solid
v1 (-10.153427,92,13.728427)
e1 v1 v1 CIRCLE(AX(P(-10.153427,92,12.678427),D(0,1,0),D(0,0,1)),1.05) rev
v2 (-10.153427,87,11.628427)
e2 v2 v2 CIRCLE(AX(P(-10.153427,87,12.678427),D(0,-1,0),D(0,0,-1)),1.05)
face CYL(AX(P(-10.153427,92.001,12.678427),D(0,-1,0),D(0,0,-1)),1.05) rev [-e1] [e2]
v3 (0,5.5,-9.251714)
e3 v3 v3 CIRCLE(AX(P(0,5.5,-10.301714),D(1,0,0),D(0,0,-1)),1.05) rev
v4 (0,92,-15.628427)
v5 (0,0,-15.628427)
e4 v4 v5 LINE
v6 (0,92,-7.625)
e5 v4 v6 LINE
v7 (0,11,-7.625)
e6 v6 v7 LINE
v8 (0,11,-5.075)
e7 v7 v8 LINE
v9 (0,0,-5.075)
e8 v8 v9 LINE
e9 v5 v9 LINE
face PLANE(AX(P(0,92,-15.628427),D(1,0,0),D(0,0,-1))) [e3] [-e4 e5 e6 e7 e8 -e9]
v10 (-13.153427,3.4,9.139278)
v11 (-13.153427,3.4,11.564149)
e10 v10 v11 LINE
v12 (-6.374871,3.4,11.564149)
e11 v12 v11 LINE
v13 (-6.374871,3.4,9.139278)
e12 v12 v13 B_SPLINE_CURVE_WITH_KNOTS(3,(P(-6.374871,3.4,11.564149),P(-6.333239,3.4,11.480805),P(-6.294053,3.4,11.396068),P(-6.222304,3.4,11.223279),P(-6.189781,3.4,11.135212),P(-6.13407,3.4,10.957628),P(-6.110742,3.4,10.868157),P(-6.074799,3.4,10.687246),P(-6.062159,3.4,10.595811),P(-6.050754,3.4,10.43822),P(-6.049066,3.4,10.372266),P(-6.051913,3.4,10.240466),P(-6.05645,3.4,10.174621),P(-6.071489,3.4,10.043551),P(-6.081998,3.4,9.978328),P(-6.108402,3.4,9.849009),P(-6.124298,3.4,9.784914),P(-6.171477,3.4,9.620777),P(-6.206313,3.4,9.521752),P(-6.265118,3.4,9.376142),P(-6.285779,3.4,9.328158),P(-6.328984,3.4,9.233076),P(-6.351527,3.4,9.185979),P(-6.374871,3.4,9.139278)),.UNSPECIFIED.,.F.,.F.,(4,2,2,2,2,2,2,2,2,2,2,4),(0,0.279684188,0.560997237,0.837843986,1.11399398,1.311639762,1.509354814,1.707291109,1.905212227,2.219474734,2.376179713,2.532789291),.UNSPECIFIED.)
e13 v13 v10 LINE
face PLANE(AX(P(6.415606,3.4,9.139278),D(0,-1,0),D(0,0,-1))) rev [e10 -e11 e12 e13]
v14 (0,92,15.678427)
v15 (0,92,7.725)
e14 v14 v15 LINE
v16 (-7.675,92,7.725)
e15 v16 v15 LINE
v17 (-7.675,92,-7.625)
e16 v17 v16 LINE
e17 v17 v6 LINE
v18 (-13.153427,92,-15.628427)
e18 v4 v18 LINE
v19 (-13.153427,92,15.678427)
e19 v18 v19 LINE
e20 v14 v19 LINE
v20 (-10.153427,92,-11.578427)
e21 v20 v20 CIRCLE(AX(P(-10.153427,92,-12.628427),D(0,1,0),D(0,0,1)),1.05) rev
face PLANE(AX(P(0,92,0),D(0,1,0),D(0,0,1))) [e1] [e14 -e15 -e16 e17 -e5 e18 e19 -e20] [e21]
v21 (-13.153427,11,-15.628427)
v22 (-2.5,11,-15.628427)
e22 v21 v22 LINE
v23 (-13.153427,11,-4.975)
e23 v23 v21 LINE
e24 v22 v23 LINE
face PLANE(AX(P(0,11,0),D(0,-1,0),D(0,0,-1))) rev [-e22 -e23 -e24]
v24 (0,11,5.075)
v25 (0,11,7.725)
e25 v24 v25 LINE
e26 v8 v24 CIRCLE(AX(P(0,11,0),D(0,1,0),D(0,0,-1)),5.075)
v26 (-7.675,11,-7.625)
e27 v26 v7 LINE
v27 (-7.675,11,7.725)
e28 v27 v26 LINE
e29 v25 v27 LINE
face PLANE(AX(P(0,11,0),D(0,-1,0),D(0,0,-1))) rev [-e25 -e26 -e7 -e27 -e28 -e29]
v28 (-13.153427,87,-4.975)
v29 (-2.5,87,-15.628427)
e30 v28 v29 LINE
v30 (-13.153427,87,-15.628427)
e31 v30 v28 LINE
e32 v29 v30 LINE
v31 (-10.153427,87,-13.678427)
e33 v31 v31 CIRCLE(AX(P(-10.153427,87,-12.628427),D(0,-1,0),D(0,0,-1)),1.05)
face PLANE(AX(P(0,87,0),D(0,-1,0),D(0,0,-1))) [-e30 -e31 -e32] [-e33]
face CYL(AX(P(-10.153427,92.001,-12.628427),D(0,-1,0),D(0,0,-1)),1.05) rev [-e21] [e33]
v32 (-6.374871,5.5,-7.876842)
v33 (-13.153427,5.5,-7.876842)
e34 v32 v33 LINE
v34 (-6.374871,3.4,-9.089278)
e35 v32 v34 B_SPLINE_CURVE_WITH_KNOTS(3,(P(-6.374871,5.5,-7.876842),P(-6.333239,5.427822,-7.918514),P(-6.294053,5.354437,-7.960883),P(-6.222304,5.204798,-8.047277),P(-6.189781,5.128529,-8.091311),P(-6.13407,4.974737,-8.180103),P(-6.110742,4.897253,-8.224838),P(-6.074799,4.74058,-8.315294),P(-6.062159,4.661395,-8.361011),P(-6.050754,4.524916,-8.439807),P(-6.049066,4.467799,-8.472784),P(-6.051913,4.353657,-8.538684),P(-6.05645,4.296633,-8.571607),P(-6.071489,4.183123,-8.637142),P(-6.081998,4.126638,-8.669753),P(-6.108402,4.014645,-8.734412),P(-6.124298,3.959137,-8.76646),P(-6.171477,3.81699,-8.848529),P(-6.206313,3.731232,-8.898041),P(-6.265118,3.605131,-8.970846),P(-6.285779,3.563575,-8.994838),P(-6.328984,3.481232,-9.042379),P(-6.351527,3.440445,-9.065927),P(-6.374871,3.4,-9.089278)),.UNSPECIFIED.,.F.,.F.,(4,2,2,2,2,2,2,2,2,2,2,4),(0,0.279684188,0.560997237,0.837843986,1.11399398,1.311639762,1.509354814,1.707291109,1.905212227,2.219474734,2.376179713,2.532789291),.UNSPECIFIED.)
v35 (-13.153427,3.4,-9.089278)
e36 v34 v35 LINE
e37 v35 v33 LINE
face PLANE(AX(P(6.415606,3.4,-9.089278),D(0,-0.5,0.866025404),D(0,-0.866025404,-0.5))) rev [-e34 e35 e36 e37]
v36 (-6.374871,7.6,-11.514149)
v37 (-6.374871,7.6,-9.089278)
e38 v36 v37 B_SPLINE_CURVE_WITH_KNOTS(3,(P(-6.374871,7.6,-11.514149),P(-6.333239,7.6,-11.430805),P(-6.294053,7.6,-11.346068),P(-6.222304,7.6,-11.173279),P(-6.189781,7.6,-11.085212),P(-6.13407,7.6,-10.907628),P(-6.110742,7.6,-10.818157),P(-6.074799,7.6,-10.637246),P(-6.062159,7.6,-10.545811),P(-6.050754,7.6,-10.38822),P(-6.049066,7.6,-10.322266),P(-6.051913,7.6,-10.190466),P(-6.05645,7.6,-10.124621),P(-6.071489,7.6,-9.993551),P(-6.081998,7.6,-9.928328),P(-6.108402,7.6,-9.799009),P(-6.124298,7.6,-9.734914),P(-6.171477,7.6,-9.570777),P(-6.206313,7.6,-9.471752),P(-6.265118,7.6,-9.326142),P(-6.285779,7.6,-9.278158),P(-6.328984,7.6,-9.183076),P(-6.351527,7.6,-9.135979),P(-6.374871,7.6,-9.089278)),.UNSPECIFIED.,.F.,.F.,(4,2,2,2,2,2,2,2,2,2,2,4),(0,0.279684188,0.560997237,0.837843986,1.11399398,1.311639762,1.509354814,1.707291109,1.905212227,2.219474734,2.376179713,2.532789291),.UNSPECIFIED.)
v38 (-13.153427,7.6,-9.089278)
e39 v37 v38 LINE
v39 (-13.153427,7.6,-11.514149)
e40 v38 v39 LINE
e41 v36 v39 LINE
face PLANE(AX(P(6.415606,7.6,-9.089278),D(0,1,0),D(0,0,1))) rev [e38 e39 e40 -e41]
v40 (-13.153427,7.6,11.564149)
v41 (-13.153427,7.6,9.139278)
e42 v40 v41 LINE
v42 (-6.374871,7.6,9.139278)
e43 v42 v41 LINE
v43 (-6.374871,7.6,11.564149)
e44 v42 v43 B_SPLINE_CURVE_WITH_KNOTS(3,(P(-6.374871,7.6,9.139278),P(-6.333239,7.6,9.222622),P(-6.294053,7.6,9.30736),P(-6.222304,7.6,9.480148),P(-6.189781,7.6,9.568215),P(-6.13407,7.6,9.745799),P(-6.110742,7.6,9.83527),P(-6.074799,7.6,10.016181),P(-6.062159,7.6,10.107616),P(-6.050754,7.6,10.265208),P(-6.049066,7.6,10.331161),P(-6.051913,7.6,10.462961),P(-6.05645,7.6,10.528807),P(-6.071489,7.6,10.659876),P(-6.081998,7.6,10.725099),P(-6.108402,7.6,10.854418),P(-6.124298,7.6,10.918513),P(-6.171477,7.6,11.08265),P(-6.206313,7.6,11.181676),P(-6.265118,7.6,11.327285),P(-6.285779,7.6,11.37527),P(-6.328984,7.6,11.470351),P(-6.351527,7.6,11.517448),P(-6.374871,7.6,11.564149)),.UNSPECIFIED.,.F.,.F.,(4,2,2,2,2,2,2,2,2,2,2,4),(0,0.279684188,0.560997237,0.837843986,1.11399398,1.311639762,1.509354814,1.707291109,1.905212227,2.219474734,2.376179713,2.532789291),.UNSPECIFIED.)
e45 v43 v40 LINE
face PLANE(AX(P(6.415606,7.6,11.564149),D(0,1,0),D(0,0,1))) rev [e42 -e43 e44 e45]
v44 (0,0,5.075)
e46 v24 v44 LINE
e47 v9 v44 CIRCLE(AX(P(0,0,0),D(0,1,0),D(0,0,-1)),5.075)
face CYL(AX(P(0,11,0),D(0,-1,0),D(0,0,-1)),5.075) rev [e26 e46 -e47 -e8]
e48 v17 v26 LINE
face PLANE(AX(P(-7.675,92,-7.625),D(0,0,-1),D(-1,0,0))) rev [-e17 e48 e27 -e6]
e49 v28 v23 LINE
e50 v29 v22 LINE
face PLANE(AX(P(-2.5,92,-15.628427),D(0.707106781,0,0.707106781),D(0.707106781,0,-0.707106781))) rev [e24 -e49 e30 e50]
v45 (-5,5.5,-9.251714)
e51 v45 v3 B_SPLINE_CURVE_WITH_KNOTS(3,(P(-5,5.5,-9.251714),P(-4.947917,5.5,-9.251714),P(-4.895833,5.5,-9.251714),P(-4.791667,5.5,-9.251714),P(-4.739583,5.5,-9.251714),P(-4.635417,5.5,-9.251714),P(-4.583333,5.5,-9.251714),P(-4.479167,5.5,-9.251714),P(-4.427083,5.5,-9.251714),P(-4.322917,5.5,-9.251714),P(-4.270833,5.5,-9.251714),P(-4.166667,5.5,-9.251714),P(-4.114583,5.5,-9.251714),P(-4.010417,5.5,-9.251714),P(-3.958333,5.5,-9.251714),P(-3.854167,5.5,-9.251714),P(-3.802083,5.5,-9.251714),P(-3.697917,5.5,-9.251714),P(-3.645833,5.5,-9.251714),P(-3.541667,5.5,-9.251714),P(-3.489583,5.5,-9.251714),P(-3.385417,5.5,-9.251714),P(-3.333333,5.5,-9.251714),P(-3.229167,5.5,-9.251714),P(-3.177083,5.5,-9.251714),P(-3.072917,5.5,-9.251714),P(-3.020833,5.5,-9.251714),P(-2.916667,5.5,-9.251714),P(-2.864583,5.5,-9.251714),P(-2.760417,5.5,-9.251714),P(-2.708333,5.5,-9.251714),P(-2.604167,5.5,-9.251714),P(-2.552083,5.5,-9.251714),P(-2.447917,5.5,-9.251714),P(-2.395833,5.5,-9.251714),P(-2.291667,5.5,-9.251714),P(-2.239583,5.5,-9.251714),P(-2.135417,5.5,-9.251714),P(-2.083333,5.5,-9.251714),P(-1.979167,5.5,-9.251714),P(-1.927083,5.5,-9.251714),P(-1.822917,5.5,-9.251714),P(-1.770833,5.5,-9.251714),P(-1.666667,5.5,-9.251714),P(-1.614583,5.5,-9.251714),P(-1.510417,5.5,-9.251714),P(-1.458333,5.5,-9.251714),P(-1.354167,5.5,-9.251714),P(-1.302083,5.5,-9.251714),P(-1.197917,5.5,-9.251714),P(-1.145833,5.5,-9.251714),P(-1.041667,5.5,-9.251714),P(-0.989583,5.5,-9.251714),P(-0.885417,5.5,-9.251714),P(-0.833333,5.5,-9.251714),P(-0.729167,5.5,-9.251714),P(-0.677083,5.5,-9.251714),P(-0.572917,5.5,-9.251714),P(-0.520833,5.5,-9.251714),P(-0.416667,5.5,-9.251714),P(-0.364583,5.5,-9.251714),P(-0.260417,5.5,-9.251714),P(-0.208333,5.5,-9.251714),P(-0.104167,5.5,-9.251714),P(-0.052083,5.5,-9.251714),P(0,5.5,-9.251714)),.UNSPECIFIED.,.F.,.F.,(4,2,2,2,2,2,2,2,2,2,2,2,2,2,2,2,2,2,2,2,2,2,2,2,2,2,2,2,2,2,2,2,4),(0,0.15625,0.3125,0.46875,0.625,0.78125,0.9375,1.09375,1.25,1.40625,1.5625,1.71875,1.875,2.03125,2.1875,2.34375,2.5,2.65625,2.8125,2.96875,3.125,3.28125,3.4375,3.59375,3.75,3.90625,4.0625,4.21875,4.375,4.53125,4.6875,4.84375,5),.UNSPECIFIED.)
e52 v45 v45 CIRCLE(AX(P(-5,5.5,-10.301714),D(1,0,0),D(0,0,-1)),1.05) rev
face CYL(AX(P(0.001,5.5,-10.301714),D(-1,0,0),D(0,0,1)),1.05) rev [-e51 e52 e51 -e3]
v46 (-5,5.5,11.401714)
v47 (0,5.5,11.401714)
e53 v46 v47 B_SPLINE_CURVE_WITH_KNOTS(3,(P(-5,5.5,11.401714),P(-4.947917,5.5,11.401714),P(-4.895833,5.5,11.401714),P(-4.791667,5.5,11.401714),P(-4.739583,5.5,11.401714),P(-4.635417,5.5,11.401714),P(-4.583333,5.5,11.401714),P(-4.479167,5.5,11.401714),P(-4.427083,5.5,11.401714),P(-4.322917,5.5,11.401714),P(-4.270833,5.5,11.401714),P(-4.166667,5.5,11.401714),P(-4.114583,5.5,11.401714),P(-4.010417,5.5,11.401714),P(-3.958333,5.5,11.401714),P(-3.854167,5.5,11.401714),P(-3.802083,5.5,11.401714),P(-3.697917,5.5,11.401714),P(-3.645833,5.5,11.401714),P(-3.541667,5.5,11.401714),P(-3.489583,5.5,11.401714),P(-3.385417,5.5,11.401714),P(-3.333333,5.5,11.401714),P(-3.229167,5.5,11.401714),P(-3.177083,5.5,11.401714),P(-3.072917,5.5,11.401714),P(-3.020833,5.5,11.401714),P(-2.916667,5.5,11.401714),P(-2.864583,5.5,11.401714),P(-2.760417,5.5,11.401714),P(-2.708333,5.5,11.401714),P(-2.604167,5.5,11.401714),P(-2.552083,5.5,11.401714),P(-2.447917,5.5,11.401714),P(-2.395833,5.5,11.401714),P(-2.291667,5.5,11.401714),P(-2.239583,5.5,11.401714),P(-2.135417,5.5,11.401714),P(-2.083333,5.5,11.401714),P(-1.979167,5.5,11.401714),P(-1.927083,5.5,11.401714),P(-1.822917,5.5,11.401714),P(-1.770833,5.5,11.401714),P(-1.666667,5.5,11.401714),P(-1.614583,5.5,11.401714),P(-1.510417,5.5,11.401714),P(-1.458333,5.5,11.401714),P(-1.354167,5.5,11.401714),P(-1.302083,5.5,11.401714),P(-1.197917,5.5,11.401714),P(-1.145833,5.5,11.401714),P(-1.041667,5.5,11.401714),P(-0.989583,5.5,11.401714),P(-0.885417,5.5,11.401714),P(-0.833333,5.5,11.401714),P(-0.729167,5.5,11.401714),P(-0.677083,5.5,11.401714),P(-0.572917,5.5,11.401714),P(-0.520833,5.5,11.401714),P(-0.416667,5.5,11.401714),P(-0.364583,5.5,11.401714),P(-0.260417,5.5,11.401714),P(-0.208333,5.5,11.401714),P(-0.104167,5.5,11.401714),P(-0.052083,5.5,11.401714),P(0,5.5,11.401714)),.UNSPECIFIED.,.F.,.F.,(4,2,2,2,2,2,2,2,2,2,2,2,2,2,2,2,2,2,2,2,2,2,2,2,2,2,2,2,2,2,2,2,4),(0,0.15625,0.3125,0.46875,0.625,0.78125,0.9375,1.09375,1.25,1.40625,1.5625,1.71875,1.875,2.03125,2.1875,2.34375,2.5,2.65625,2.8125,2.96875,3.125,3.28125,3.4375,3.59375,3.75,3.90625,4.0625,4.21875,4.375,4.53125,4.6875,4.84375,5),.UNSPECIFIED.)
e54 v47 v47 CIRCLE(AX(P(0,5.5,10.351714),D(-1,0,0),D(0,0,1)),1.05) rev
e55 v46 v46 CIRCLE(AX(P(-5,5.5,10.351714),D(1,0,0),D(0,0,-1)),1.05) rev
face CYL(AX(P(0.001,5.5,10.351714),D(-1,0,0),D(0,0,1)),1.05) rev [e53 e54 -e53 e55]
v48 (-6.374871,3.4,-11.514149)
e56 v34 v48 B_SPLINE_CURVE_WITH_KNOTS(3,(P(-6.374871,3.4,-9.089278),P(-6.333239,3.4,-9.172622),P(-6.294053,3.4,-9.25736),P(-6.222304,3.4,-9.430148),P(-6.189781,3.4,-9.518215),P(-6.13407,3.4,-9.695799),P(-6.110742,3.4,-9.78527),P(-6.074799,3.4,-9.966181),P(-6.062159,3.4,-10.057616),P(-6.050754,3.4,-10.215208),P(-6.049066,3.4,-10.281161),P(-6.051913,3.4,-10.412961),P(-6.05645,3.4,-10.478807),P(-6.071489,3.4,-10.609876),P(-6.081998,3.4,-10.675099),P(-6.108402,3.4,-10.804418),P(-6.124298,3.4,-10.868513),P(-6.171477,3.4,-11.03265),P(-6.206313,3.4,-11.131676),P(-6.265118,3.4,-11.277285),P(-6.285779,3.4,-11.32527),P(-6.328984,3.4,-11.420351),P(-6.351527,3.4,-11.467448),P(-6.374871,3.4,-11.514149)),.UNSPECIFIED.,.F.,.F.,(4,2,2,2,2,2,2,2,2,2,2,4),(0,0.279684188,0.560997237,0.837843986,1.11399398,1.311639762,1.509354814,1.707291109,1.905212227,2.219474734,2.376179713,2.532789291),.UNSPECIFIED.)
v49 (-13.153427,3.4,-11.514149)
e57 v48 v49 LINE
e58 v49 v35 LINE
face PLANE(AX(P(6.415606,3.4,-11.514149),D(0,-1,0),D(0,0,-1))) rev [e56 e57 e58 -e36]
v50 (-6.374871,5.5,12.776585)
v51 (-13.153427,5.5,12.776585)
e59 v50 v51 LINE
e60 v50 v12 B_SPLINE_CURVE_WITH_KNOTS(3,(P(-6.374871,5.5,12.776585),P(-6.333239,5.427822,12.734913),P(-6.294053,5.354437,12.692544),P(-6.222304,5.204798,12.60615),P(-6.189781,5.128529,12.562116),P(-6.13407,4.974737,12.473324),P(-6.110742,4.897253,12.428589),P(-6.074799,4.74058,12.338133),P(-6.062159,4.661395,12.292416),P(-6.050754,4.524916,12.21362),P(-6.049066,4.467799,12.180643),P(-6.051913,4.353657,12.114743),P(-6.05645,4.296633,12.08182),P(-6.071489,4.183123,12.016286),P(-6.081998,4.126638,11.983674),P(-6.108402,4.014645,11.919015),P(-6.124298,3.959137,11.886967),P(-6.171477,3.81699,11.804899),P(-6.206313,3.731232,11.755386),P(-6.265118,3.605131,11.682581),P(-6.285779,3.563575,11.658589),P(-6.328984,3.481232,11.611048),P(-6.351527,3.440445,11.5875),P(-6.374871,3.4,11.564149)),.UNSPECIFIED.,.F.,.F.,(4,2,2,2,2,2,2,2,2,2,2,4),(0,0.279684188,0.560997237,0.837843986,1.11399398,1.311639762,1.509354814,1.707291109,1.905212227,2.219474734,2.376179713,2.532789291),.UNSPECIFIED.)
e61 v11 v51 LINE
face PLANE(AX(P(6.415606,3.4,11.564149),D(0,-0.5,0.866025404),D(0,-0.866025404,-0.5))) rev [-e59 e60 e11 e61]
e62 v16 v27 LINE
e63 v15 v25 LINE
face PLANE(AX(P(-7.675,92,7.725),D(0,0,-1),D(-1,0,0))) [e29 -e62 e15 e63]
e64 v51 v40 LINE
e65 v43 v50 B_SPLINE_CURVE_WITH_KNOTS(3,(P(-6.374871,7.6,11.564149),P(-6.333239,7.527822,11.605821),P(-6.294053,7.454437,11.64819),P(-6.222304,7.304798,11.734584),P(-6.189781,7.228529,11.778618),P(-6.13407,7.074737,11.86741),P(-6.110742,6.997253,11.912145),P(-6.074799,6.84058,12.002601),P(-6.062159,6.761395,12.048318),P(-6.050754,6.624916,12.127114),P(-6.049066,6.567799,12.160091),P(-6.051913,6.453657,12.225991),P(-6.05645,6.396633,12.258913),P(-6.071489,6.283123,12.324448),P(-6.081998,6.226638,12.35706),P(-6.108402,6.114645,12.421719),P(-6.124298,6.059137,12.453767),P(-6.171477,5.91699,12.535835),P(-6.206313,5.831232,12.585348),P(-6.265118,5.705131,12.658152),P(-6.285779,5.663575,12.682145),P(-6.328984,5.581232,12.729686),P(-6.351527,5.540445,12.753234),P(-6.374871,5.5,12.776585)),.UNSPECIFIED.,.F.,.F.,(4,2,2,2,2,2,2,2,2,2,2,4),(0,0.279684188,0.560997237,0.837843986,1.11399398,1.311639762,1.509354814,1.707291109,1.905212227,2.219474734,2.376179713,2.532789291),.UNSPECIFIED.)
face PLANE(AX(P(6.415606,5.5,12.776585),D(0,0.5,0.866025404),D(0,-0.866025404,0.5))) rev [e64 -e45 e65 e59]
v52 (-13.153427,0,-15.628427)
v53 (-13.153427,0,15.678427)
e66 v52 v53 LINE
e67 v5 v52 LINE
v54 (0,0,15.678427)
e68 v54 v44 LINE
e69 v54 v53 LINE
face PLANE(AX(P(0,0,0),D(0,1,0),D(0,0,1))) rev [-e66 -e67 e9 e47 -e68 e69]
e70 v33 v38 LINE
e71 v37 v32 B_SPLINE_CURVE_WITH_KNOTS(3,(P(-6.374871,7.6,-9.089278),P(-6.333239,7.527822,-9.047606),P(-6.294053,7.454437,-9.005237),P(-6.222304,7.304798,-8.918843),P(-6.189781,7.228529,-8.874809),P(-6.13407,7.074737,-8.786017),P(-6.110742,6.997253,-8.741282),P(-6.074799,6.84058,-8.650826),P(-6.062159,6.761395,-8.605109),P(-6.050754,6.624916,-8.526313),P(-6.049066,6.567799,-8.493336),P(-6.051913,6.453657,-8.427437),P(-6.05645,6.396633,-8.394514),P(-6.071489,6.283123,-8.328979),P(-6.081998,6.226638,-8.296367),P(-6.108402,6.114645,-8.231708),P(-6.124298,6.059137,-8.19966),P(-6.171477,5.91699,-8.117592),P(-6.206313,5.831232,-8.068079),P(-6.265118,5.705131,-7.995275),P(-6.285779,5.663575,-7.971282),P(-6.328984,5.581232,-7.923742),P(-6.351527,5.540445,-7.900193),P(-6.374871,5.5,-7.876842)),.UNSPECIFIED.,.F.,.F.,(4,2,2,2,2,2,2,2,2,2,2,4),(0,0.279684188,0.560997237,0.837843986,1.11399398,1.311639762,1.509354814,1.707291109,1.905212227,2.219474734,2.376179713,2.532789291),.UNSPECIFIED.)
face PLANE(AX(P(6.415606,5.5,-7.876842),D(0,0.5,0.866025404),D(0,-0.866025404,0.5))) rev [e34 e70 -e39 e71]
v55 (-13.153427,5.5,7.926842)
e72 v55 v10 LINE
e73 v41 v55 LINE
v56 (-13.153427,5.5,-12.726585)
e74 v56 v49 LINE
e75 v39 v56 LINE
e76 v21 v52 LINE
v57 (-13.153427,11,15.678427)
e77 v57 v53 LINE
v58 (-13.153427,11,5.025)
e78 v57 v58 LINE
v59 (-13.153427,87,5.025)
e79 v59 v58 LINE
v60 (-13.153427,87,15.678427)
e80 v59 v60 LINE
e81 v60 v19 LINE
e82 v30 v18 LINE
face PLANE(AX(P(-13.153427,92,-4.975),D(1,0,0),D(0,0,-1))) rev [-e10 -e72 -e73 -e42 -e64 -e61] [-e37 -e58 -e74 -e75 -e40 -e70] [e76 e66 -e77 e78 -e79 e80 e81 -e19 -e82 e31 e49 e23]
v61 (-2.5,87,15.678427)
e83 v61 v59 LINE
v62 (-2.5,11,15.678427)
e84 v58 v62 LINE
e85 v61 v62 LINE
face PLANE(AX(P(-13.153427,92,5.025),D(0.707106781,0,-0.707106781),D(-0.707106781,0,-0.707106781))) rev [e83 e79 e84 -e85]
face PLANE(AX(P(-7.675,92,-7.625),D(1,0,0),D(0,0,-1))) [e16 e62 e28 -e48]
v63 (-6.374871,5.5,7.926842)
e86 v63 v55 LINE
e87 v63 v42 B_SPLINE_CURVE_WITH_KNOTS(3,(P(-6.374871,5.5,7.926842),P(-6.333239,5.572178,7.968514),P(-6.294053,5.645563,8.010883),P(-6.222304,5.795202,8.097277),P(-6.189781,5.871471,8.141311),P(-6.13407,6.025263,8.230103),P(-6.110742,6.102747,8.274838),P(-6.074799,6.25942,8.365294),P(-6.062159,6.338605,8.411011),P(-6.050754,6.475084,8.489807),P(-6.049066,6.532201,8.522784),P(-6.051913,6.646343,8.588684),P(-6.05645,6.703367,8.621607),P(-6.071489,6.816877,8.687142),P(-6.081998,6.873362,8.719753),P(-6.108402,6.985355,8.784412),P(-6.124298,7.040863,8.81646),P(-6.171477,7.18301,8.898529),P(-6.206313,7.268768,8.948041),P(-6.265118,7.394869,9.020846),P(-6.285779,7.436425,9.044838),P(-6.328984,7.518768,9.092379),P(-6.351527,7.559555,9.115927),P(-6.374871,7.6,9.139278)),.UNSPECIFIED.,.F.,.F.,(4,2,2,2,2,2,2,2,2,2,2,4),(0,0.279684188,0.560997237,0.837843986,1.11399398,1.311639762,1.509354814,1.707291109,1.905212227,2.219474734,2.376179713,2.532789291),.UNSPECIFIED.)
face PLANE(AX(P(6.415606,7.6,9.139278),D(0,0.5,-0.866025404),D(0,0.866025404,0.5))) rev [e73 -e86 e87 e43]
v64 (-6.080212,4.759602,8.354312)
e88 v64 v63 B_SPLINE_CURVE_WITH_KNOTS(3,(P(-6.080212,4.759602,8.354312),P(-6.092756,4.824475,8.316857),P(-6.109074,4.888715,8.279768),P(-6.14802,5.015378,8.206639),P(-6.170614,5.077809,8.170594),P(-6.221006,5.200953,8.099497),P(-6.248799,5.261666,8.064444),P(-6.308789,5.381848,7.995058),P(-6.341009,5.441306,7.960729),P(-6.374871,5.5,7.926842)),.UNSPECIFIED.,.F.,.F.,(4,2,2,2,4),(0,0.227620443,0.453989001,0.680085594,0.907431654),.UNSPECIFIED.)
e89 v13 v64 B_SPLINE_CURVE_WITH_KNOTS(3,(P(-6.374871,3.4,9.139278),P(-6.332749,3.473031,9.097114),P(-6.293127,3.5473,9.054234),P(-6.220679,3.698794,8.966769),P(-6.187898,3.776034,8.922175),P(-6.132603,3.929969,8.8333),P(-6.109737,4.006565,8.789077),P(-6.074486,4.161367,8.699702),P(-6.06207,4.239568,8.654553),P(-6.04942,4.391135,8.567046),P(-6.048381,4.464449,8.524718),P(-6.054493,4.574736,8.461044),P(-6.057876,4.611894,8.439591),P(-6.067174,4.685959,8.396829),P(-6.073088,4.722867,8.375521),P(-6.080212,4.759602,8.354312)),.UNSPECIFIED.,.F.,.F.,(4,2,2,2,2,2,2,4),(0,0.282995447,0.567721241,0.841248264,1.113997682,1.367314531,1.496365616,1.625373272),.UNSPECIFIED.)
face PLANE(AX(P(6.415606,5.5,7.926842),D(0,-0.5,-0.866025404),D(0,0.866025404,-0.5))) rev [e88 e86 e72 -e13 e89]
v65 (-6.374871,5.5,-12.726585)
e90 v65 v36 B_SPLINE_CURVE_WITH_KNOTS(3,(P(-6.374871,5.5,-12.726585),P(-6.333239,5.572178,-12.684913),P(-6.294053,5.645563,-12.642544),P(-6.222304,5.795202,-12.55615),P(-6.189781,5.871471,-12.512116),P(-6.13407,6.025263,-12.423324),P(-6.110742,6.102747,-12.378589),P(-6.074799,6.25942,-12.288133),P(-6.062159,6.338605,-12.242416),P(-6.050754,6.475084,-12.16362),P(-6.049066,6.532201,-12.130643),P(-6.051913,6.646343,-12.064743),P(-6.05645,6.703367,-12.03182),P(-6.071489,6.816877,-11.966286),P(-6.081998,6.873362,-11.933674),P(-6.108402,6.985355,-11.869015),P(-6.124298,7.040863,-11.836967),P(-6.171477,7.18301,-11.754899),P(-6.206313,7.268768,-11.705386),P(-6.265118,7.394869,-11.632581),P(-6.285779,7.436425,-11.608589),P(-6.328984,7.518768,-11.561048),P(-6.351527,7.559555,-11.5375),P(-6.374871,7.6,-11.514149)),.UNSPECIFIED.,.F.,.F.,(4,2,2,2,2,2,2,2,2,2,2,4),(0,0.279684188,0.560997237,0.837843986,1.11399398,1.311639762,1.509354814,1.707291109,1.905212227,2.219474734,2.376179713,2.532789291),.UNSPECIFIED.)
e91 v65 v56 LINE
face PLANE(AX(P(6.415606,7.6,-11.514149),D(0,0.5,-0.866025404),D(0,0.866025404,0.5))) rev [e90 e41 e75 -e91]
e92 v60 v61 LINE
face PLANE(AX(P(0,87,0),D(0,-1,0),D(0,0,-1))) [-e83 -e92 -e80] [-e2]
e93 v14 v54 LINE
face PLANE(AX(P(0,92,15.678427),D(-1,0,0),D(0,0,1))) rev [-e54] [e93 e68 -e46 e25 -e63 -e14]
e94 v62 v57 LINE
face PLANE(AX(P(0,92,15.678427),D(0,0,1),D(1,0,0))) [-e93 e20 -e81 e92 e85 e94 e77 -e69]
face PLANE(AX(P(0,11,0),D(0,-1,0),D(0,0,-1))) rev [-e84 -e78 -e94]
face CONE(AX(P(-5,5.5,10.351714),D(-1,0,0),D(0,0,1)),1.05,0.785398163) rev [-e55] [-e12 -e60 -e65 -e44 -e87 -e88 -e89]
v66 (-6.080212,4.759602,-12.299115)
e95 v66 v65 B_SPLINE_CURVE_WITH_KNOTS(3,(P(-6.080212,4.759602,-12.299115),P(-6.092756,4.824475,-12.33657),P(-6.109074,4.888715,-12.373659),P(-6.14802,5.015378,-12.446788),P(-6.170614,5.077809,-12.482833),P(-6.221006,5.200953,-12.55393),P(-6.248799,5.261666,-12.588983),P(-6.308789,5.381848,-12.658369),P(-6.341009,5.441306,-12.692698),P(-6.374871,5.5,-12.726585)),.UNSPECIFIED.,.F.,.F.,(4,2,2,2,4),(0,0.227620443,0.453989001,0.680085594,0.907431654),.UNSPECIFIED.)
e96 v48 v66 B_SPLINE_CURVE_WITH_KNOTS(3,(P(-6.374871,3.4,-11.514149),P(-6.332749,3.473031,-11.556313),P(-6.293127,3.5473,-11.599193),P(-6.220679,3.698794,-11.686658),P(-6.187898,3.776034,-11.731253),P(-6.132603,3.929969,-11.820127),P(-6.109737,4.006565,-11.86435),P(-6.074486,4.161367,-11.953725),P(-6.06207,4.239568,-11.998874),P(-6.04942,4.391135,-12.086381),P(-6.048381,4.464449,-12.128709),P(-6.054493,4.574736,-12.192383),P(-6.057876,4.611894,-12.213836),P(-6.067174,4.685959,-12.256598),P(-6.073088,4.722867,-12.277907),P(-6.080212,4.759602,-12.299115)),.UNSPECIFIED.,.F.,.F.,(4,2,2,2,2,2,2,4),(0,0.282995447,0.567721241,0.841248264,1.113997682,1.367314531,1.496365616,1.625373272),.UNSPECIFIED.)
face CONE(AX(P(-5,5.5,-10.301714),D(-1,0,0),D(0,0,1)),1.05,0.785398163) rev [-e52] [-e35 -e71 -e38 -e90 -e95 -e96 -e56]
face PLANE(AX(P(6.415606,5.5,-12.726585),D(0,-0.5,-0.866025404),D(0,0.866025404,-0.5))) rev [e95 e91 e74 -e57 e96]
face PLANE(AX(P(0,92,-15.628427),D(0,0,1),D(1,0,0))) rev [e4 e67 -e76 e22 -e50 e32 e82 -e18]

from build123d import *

# Parameters (mm, degrees)
BOSS_EXTRUDE1_DEPTH = 92
BOSS_EXTRUDE2_DEPTH = 11
BOSS_EXTRUDE3_DEPTH = 5
CUT_EXTRUDE1_REACH  = 91.375
SKETCH4_R           = 1.05
BOSS_EXTRUDE4_DEPTH = 11
CUT_EXTRUDE2_DEPTH  = 6.153427125
CUT_EXTRUDE3_REACH  = 96.249
SKETCH7_R           = 1.05
CHAMFER2_SIZE       = 2


with BuildPart() as part:
    # Sketch1 → Boss-Extrude1 (new body)
    with BuildSketch(Plane(origin=(0, 0, 0), x_dir=(1, 0, 0), z_dir=(0, 1, 0))):
        Polygon((0, 15.628427125), (-2.5, 15.628427125), (-13.153427125, 4.975), (-13.153427125, -5.025), (-2.5, -15.678427125), (0, -15.678427125), (0, -7.725), (-7.675, -7.725), (-7.675, 7.625), (0, 7.625), align=None)
    extrude(amount=BOSS_EXTRUDE1_DEPTH)

    # Sketch2 → Boss-Extrude2 (add)
    with BuildSketch(Plane.XZ):
        with BuildLine():
            Line((0, 7.725), (0, 5.075))
            ThreePointArc((0, 5.075), (-5.075, 0), (0, -5.075))
            Line((0, -5.075), (0, -7.625))
            Line((0, -7.625), (-7.675, -7.625))
            Line((-7.675, -7.625), (-7.675, 7.725))
            Line((-7.675, 7.725), (0, 7.725))
        make_face()
    extrude(amount=-BOSS_EXTRUDE2_DEPTH)

    # Sketch3 → Boss-Extrude3 (add)
    with BuildSketch(Plane(origin=(0, 92, 0), x_dir=(1, 0, 0), z_dir=(0, 1, 0))):
        Polygon((-2.5, 15.628427125), (-13.153427125, 15.628427125), (-13.153427125, 4.975), align=None)
        Polygon((-2.5, -15.678427125), (-13.153427125, -15.678427125), (-13.153427125, -5.025), align=None)
    extrude(amount=-BOSS_EXTRUDE3_DEPTH)

    # Sketch4 → Cut-Extrude1 (cut, up to next)
    with BuildSketch(Plane.XZ.offset(-87), mode=Mode.PRIVATE) as cut_extrude1_sk1:
        with Locations(Location((-10.153427125, 12.678427125, 0), (0, 0, 270))):
            Circle(SKETCH4_R)
    cut_extrude1_tool1 = extrude(cut_extrude1_sk1.sketch, amount=-CUT_EXTRUDE1_REACH, mode=Mode.PRIVATE) & part.part
    # Sketch4 → Cut-Extrude1 (cut, up to next)
    with BuildSketch(Plane.XZ.offset(-87), mode=Mode.PRIVATE) as cut_extrude1_sk2:
        with Locations(Location((-10.153427125, -12.628427125, 0), (0, 0, 270))):
            Circle(SKETCH4_R)
    cut_extrude1_tool2 = extrude(cut_extrude1_sk2.sketch, amount=-CUT_EXTRUDE1_REACH, mode=Mode.PRIVATE) & part.part
    add(cut_extrude1_tool1.solids().sort_by_distance((-10.153427, 87, 12.678427))[0], mode=Mode.SUBTRACT)
    add(cut_extrude1_tool2.solids().sort_by_distance((-10.153427, 87, -12.628427))[0], mode=Mode.SUBTRACT)

    # Sketch5 → Boss-Extrude4 (add)
    with BuildSketch(Plane.XZ):
        Polygon((-2.5, 15.678427125), (-13.153427125, 15.678427125), (-13.153427125, 5.025), align=None)
        Polygon((-13.153427125, -4.975), (-13.153427125, -15.628427125), (-2.5, -15.628427125), align=None)
    extrude(amount=-BOSS_EXTRUDE4_DEPTH)

    # Sketch6 → Cut-Extrude2 (cut)
    with BuildSketch(Plane.ZY.offset(13.153427125)):
        Polygon((11.564149128, 7.6), (9.139277997, 7.6), (7.926842432, 5.5), (9.139277997, 3.4), (11.564149128, 3.4), (12.776584693, 5.5), align=None)
        Polygon((-7.876842432, 5.5), (-9.089277997, 7.6), (-11.514149128, 7.6), (-12.726584693, 5.5), (-11.514149128, 3.4), (-9.089277997, 3.4), align=None)
    extrude(amount=-CUT_EXTRUDE2_DEPTH, mode=Mode.SUBTRACT)

    # Sketch7 → Cut-Extrude3 (cut, up to next)
    with BuildSketch(Plane.ZY.offset(13.153427125), mode=Mode.PRIVATE) as cut_extrude3_sk1:
        with Locations((-10.301713562, 5.5)):
            Circle(SKETCH7_R)
    cut_extrude3_tool1 = extrude(cut_extrude3_sk1.sketch, amount=-CUT_EXTRUDE3_REACH, mode=Mode.PRIVATE) & part.part
    # Sketch7 → Cut-Extrude3 (cut, up to next)
    with BuildSketch(Plane.ZY.offset(13.153427125), mode=Mode.PRIVATE) as cut_extrude3_sk2:
        with Locations((10.351713562, 5.5)):
            Circle(SKETCH7_R)
    cut_extrude3_tool2 = extrude(cut_extrude3_sk2.sketch, amount=-CUT_EXTRUDE3_REACH, mode=Mode.PRIVATE) & part.part
    add(cut_extrude3_tool1.solids().sort_by_distance((-13.153427, 5.5, -10.301714))[0], mode=Mode.SUBTRACT)
    add(cut_extrude3_tool2.solids().sort_by_distance((-13.153427, 5.5, 10.351714))[0], mode=Mode.SUBTRACT)

    # Chamfer2
    # the kernel refuses this chamfer: 2 mm, written as the material it takes off along each edge
    with BuildSketch(Plane(origin=(-7, 5.5, 10.351713562), x_dir=(0, 0, 1), z_dir=(0, -1, 0))) as chamfer2_piece_1_section:
        Polygon((1.05, -CHAMFER2_SIZE), (1.05 + CHAMFER2_SIZE, 0), (1.05, 0), align=None)
    chamfer2_piece_1 = revolve(axis=Axis((-7, 5.5, 10.351713562), (-1, 0, 0)), mode=Mode.PRIVATE)
    chamfer2_piece_1 = split(chamfer2_piece_1, bisect_by=Plane(origin=(-5.677336613, 7.282209745, 11.747625417), z_dir=(2.5539348178531628e-15, -0.5000000000000006, -0.8660254037844384)), keep=Keep.TOP, mode=Mode.PRIVATE)
    chamfer2_piece_1 = split(chamfer2_piece_1, bisect_by=Plane(origin=(-5.677336613, 3.717790255, 11.747625417), z_dir=(2.553934817853164e-15, 0.5000000000000003, -0.8660254037844387)), keep=Keep.TOP, mode=Mode.PRIVATE)
    chamfer2_piece_1 = split(chamfer2_piece_1, bisect_by=Plane(origin=(-5.677336613, 3.4, 8.660747588), z_dir=(0, 1, 0)), keep=Keep.TOP, mode=Mode.PRIVATE)
    chamfer2_piece_1 = split(chamfer2_piece_1, bisect_by=Plane(origin=(-5.677336613, 5.182209745, 8.110318721), z_dir=(-2.5539348178531624e-15, 0.5000000000000008, 0.8660254037844383)), keep=Keep.TOP, mode=Mode.PRIVATE)
    chamfer2_piece_1 = split(chamfer2_piece_1, bisect_by=Plane(origin=(-5.677336613, 5.817790255, 8.110318721), z_dir=(-2.5539348178531624e-15, -0.5000000000000007, 0.8660254037844384)), keep=Keep.TOP, mode=Mode.PRIVATE)
    chamfer2_piece_1 = split(chamfer2_piece_1, bisect_by=Plane(origin=(-5.677336613, 7.6, 8.660747588), z_dir=(0, -1, 0)), keep=Keep.TOP, mode=Mode.PRIVATE)
    add(chamfer2_piece_1, mode=Mode.SUBTRACT)
    with BuildSketch(Plane(origin=(-7, 5.5, -10.301713562), x_dir=(0, 0, 1), z_dir=(0, -1, 0))) as chamfer2_piece_2_section:
        Polygon((1.05, -CHAMFER2_SIZE), (1.05 + CHAMFER2_SIZE, 0), (1.05, 0), align=None)
    chamfer2_piece_2 = revolve(axis=Axis((-7, 5.5, -10.301713562), (-1, 0, 0)), mode=Mode.PRIVATE)
    chamfer2_piece_2 = split(chamfer2_piece_2, bisect_by=Plane(origin=(-5.677336613, 3.717790255, -8.905801708), z_dir=(2.5539348178531635e-15, 0.5000000000000004, -0.8660254037844385)), keep=Keep.TOP, mode=Mode.PRIVATE)
    chamfer2_piece_2 = split(chamfer2_piece_2, bisect_by=Plane(origin=(-5.677336613, 3.4, -11.992679537), z_dir=(0, 1, 0)), keep=Keep.TOP, mode=Mode.PRIVATE)
    chamfer2_piece_2 = split(chamfer2_piece_2, bisect_by=Plane(origin=(-5.677336613, 5.182209745, -12.543108404), z_dir=(-2.5539348178531647e-15, 0.49999999999999933, 0.866025403784439)), keep=Keep.TOP, mode=Mode.PRIVATE)
    chamfer2_piece_2 = split(chamfer2_piece_2, bisect_by=Plane(origin=(-5.677336613, 5.817790255, -12.543108404), z_dir=(-2.5539348178531624e-15, -0.5000000000000007, 0.8660254037844384)), keep=Keep.TOP, mode=Mode.PRIVATE)
    chamfer2_piece_2 = split(chamfer2_piece_2, bisect_by=Plane(origin=(-5.677336613, 7.6, -11.992679537), z_dir=(0, -1, 0)), keep=Keep.TOP, mode=Mode.PRIVATE)
    chamfer2_piece_2 = split(chamfer2_piece_2, bisect_by=Plane(origin=(-5.677336613, 7.282209745, -8.905801708), z_dir=(2.553934817853164e-15, -0.5000000000000002, -0.8660254037844386)), keep=Keep.TOP, mode=Mode.PRIVATE)
    add(chamfer2_piece_2, mode=Mode.SUBTRACT)


solid = part.part
